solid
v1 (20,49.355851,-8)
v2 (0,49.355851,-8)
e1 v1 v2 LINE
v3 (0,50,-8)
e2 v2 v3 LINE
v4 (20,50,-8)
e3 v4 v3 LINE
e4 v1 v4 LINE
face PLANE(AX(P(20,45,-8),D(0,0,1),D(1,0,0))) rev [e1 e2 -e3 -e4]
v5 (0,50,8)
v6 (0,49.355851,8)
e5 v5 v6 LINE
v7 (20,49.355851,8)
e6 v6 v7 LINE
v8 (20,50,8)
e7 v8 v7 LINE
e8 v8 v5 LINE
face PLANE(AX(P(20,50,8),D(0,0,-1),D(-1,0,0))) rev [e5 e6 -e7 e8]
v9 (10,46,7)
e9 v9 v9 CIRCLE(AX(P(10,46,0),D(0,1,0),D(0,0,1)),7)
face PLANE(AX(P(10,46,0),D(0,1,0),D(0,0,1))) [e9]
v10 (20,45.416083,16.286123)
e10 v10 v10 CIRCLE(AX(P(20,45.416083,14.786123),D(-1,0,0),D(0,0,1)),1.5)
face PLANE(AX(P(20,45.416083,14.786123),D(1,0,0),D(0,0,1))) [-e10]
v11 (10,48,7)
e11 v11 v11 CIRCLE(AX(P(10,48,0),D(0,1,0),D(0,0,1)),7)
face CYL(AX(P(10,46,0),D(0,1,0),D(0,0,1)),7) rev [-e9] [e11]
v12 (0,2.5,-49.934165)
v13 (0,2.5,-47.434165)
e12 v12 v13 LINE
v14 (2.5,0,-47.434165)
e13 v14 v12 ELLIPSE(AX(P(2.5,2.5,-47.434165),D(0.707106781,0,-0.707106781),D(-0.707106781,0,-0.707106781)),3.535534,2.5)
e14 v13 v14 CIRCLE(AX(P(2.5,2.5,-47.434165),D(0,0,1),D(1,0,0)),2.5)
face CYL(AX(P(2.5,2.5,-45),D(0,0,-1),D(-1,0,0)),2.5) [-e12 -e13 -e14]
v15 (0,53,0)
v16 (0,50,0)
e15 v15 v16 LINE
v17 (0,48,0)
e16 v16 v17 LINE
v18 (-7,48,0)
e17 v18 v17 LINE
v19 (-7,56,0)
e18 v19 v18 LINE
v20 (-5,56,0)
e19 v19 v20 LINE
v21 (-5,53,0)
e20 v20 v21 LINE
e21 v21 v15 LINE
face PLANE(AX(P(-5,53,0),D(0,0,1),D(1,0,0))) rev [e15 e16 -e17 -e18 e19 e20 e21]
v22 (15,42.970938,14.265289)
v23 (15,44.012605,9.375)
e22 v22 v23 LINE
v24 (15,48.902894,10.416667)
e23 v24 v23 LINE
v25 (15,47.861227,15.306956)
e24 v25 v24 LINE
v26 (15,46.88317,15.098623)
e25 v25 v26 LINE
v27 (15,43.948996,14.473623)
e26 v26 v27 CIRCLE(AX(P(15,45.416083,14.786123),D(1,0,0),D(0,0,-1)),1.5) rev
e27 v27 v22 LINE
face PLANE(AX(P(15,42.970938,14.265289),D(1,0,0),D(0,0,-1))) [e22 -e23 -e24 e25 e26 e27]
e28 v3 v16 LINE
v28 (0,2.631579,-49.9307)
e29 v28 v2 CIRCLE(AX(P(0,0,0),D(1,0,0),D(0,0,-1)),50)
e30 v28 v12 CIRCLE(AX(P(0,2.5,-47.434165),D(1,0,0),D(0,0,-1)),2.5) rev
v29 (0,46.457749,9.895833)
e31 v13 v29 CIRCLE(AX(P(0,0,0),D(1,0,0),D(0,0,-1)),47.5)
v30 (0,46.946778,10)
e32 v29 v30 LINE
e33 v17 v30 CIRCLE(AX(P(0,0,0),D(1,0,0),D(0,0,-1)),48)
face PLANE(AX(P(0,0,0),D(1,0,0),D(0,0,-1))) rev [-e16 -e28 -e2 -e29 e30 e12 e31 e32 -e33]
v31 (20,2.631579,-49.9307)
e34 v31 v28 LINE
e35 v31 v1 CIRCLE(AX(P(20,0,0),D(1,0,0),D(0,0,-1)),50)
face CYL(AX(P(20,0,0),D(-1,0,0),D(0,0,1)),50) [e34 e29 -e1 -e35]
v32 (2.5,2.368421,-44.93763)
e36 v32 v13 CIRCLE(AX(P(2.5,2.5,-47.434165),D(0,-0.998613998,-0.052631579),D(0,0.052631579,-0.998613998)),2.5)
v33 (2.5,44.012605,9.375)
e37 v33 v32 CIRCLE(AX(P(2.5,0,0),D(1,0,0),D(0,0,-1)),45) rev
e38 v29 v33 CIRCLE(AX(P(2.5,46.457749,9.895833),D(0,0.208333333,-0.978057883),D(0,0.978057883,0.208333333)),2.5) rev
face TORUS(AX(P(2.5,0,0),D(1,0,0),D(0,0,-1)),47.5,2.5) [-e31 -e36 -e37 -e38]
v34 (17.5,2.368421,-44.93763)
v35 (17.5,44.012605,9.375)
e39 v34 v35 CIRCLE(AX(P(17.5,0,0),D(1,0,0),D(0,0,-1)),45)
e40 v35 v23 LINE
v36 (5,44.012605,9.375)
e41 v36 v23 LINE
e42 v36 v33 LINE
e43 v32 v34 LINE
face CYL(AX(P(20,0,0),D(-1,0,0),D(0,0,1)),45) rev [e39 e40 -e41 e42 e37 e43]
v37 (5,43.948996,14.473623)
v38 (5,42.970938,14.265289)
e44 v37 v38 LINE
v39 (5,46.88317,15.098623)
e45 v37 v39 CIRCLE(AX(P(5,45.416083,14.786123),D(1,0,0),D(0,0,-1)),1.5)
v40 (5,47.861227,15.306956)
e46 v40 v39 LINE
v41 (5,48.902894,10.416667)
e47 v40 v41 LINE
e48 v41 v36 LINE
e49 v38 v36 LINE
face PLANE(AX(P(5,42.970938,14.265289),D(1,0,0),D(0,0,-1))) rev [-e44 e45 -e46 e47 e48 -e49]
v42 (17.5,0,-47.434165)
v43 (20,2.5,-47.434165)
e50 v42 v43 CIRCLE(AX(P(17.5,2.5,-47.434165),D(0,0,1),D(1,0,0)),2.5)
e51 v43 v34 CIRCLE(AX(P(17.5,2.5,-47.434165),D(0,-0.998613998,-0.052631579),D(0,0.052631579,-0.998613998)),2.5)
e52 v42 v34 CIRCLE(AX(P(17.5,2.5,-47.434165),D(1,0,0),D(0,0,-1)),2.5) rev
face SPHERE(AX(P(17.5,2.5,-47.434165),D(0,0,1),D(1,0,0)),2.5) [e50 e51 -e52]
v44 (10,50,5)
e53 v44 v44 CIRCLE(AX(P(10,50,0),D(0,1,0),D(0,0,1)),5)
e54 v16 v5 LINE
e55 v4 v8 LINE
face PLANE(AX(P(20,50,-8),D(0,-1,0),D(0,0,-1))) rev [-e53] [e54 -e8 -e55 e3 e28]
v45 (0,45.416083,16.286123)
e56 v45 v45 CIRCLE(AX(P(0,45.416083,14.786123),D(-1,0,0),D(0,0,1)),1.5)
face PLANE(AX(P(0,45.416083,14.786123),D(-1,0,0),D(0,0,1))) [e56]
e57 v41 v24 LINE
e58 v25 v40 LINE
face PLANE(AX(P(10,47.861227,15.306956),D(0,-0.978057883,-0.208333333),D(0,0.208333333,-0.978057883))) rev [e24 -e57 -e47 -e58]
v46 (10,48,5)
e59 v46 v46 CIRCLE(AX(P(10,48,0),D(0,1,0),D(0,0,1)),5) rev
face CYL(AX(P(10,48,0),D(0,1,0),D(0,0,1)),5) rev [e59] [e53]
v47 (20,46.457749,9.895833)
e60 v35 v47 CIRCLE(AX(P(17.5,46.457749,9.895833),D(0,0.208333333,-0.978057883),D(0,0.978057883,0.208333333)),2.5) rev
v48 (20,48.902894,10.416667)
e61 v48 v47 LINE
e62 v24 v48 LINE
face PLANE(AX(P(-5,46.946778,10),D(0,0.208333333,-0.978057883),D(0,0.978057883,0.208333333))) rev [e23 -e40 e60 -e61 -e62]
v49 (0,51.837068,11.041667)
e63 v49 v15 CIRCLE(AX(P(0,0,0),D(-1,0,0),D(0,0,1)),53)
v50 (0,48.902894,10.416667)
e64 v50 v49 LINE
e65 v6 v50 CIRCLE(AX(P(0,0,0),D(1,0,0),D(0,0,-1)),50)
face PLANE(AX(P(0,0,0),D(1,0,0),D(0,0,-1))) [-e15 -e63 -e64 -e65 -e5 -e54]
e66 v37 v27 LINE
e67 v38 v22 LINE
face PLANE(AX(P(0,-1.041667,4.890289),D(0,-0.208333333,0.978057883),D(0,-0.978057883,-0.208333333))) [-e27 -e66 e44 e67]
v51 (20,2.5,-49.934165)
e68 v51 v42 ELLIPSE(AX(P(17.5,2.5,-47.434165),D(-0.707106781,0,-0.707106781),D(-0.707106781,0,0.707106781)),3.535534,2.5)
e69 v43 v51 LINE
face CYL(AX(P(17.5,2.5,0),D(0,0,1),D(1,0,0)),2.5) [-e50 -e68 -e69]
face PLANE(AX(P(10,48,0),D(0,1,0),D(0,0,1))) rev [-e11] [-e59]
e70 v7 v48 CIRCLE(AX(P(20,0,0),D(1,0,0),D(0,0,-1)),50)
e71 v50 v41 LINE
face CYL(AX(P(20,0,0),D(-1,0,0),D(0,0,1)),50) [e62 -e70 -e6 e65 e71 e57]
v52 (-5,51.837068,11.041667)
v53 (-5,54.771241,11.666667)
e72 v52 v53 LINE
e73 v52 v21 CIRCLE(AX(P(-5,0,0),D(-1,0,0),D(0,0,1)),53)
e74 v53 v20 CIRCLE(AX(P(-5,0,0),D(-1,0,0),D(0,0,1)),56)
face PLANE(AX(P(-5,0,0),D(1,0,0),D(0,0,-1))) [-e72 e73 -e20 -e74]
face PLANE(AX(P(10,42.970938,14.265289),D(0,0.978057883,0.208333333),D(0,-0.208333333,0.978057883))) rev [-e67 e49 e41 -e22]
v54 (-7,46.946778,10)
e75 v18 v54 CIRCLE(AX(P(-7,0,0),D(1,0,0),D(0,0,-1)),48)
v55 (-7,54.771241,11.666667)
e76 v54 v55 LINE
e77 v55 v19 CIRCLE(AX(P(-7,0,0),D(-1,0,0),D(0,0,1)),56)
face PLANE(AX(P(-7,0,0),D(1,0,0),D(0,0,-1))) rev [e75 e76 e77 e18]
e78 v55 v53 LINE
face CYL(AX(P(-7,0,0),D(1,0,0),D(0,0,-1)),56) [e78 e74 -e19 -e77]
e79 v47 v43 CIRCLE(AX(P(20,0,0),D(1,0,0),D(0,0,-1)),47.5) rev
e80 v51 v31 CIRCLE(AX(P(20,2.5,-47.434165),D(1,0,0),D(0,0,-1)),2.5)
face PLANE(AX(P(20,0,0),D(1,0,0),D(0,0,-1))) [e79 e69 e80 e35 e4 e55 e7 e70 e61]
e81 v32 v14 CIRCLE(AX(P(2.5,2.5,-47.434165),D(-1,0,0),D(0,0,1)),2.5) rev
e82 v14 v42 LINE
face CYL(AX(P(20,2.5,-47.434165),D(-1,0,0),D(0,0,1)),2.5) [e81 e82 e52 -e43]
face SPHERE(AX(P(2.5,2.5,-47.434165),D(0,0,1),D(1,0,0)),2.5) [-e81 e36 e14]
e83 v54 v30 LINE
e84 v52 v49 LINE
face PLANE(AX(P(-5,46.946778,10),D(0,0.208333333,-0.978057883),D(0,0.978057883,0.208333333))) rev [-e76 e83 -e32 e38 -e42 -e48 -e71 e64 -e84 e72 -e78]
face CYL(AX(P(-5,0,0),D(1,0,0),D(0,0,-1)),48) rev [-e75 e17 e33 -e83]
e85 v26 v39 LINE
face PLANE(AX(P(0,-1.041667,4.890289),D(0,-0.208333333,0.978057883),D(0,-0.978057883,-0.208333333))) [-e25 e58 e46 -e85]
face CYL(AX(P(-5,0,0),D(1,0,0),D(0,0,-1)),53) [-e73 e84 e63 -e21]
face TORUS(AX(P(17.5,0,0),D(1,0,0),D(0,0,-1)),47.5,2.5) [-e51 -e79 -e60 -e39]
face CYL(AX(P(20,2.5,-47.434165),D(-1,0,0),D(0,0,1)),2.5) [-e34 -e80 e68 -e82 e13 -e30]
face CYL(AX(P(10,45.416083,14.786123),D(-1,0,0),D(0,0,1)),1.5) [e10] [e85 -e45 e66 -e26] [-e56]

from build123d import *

# Parameters (mm, degrees)
BOSS_EXTRUDE1_DEPTH = 20
BOSS_EXTRUDE2_DEPTH = 20
SKETCH4_R           = 5
CUT_EXTRUDE1_DEPTH  = 2
SKETCH5_R           = 7
CUT_EXTRUDE2_DEPTH  = 2
BOSS_EXTRUDE5_DEPTH = 5
BOSS_EXTRUDE6_DEPTH = 2
SKETCH11_W          = 20
SKETCH11_H          = 5
SKETCH12_W          = 5
SKETCH12_H          = 5
BOSS_EXTRUDE7_DEPTH = 5
SKETCH13_R          = 1.5
BOSS_EXTRUDE8_DEPTH = 5
FILLET1_R           = 2.5


with BuildPart() as part:
    # Sketch2 → Boss-Extrude1 (new body)
    with BuildSketch(Plane(origin=(0, 0, 0), x_dir=(0, 0, -1), z_dir=(1, 0, 0))):
        with BuildLine():
            Line((-50, 0), (-45, 0))
            ThreePointArc((-45, 0), (0, 45), (45, 0))
            Line((45, 0), (50, 0))
            ThreePointArc((50, 0), (0, 50), (-50, 0))
        make_face()
    extrude(amount=BOSS_EXTRUDE1_DEPTH)

    # Sketch3 → Boss-Extrude2 (add)
    with BuildSketch(Plane(origin=(0, 0, 0), x_dir=(0, 0, -1), z_dir=(1, 0, 0))):
        Polygon((0, 45), (8, 45), (8, 50), (-8, 50), (-8, 45), align=None)
    extrude(amount=BOSS_EXTRUDE2_DEPTH)

    # Sketch4 → Cut-Extrude1 (cut)
    with BuildSketch(Plane(origin=(0, 50, 0), x_dir=(1, 0, 0), z_dir=(0, 1, 0))):
        with Locations(Location((10, 0, 0), (0, 0, 270))):
            Circle(SKETCH4_R)
    extrude(amount=-CUT_EXTRUDE1_DEPTH, mode=Mode.SUBTRACT)

    # Sketch5 → Cut-Extrude2 (cut)
    with BuildSketch(Plane(origin=(0, 48, 0), x_dir=(1, 0, 0), z_dir=(0, 1, 0))):
        with Locations(Location((10, 0, 0), (0, 0, 270))):
            Circle(SKETCH5_R)
    extrude(amount=-CUT_EXTRUDE2_DEPTH, mode=Mode.SUBTRACT)

    # Sketch9 → Boss-Extrude5 (add)
    with BuildSketch(Plane.ZY):
        with BuildLine():
            Line((10, 46.946778377), (11.041666667, 51.837067792))
            ThreePointArc((11.041666667, 51.837067792), (5.551369518, 52.708465131), (0, 53))
            Line((0, 53), (0, 48))
            ThreePointArc((0, 48), (5.027655412, 47.735968421), (10, 46.946778377))
        make_face()
    extrude(amount=BOSS_EXTRUDE5_DEPTH)

    # Sketch10 → Boss-Extrude6 (add)
    with BuildSketch(Plane.ZY.offset(5)):
        with BuildLine():
            Line((10, 46.946778377), (11.666666667, 54.77124144))
            ThreePointArc((11.666666667, 54.77124144), (5.865597981, 55.691963157), (0, 56))
            Line((0, 56), (0, 48))
            ThreePointArc((0, 48), (5.027655412, 47.735968421), (10, 46.946778377))
        make_face()
    extrude(amount=BOSS_EXTRUDE6_DEPTH)

    # Cut-Sweep2: sweep along a curve in space
    with BuildLine() as cut_sweep2_path:
        ThreePointArc((0, 48.902894143, 10.416666667), (0, 31.45764348, 38.864079388), (0, 0, 50))
    # Sketch11 → Cut-Sweep2 (sweep, cut)
    with BuildSketch(Plane.XZ):
        with Locations((10, 47.5)):
            Rectangle(SKETCH11_W, SKETCH11_H)
    sweep(path=cut_sweep2_path.line, mode=Mode.SUBTRACT)

    # Sketch12 → Boss-Extrude7 (add)
    with BuildSketch(Plane(origin=(0, 0, 0), x_dir=(1, 0, 0), z_dir=(0, -0.20833333333333337, 0.9780578828587918))):
        with Locations((7.5, 47.5)):
            Rectangle(SKETCH12_W, SKETCH12_H)
    boss_extrude7 = extrude(amount=BOSS_EXTRUDE7_DEPTH)

    # Sketch13 → Boss-Extrude8 (add, symmetric)
    with BuildSketch(Plane.ZY.offset(-5)):
        with Locations((14.786122748, 45.416082769)):
            Circle(SKETCH13_R)
    boss_extrude8 = extrude(amount=BOSS_EXTRUDE8_DEPTH, both=True)

    # Mirror1: Boss-Extrude7, Boss-Extrude8 across plane
    add(boss_extrude7.mirror(Plane(origin=(10, 42.970938062, 14.265289414), x_dir=(0, 0, 1), z_dir=(-1, 0, 0))))
    add(boss_extrude8.mirror(Plane(origin=(10, 42.970938062, 14.265289414), x_dir=(0, 0, 1), z_dir=(-1, 0, 0))))

    # Fillet1
    fillet1_edges = [part.edges().sort_by_distance(p)[0] for p in [
        (10, 0, -45),
        (20, 0, -47.5),
        (10, 0, -50),
        (0, 0, -47.5),
        (0, 34.977671449, -28.311879132),
        (20, 34.977671449, -28.311879132),
    ]]
    fillet(fillet1_edges, radius=FILLET1_R - 0.0001)  # a hair under: the kernel refuses the full size


solid = part.part
